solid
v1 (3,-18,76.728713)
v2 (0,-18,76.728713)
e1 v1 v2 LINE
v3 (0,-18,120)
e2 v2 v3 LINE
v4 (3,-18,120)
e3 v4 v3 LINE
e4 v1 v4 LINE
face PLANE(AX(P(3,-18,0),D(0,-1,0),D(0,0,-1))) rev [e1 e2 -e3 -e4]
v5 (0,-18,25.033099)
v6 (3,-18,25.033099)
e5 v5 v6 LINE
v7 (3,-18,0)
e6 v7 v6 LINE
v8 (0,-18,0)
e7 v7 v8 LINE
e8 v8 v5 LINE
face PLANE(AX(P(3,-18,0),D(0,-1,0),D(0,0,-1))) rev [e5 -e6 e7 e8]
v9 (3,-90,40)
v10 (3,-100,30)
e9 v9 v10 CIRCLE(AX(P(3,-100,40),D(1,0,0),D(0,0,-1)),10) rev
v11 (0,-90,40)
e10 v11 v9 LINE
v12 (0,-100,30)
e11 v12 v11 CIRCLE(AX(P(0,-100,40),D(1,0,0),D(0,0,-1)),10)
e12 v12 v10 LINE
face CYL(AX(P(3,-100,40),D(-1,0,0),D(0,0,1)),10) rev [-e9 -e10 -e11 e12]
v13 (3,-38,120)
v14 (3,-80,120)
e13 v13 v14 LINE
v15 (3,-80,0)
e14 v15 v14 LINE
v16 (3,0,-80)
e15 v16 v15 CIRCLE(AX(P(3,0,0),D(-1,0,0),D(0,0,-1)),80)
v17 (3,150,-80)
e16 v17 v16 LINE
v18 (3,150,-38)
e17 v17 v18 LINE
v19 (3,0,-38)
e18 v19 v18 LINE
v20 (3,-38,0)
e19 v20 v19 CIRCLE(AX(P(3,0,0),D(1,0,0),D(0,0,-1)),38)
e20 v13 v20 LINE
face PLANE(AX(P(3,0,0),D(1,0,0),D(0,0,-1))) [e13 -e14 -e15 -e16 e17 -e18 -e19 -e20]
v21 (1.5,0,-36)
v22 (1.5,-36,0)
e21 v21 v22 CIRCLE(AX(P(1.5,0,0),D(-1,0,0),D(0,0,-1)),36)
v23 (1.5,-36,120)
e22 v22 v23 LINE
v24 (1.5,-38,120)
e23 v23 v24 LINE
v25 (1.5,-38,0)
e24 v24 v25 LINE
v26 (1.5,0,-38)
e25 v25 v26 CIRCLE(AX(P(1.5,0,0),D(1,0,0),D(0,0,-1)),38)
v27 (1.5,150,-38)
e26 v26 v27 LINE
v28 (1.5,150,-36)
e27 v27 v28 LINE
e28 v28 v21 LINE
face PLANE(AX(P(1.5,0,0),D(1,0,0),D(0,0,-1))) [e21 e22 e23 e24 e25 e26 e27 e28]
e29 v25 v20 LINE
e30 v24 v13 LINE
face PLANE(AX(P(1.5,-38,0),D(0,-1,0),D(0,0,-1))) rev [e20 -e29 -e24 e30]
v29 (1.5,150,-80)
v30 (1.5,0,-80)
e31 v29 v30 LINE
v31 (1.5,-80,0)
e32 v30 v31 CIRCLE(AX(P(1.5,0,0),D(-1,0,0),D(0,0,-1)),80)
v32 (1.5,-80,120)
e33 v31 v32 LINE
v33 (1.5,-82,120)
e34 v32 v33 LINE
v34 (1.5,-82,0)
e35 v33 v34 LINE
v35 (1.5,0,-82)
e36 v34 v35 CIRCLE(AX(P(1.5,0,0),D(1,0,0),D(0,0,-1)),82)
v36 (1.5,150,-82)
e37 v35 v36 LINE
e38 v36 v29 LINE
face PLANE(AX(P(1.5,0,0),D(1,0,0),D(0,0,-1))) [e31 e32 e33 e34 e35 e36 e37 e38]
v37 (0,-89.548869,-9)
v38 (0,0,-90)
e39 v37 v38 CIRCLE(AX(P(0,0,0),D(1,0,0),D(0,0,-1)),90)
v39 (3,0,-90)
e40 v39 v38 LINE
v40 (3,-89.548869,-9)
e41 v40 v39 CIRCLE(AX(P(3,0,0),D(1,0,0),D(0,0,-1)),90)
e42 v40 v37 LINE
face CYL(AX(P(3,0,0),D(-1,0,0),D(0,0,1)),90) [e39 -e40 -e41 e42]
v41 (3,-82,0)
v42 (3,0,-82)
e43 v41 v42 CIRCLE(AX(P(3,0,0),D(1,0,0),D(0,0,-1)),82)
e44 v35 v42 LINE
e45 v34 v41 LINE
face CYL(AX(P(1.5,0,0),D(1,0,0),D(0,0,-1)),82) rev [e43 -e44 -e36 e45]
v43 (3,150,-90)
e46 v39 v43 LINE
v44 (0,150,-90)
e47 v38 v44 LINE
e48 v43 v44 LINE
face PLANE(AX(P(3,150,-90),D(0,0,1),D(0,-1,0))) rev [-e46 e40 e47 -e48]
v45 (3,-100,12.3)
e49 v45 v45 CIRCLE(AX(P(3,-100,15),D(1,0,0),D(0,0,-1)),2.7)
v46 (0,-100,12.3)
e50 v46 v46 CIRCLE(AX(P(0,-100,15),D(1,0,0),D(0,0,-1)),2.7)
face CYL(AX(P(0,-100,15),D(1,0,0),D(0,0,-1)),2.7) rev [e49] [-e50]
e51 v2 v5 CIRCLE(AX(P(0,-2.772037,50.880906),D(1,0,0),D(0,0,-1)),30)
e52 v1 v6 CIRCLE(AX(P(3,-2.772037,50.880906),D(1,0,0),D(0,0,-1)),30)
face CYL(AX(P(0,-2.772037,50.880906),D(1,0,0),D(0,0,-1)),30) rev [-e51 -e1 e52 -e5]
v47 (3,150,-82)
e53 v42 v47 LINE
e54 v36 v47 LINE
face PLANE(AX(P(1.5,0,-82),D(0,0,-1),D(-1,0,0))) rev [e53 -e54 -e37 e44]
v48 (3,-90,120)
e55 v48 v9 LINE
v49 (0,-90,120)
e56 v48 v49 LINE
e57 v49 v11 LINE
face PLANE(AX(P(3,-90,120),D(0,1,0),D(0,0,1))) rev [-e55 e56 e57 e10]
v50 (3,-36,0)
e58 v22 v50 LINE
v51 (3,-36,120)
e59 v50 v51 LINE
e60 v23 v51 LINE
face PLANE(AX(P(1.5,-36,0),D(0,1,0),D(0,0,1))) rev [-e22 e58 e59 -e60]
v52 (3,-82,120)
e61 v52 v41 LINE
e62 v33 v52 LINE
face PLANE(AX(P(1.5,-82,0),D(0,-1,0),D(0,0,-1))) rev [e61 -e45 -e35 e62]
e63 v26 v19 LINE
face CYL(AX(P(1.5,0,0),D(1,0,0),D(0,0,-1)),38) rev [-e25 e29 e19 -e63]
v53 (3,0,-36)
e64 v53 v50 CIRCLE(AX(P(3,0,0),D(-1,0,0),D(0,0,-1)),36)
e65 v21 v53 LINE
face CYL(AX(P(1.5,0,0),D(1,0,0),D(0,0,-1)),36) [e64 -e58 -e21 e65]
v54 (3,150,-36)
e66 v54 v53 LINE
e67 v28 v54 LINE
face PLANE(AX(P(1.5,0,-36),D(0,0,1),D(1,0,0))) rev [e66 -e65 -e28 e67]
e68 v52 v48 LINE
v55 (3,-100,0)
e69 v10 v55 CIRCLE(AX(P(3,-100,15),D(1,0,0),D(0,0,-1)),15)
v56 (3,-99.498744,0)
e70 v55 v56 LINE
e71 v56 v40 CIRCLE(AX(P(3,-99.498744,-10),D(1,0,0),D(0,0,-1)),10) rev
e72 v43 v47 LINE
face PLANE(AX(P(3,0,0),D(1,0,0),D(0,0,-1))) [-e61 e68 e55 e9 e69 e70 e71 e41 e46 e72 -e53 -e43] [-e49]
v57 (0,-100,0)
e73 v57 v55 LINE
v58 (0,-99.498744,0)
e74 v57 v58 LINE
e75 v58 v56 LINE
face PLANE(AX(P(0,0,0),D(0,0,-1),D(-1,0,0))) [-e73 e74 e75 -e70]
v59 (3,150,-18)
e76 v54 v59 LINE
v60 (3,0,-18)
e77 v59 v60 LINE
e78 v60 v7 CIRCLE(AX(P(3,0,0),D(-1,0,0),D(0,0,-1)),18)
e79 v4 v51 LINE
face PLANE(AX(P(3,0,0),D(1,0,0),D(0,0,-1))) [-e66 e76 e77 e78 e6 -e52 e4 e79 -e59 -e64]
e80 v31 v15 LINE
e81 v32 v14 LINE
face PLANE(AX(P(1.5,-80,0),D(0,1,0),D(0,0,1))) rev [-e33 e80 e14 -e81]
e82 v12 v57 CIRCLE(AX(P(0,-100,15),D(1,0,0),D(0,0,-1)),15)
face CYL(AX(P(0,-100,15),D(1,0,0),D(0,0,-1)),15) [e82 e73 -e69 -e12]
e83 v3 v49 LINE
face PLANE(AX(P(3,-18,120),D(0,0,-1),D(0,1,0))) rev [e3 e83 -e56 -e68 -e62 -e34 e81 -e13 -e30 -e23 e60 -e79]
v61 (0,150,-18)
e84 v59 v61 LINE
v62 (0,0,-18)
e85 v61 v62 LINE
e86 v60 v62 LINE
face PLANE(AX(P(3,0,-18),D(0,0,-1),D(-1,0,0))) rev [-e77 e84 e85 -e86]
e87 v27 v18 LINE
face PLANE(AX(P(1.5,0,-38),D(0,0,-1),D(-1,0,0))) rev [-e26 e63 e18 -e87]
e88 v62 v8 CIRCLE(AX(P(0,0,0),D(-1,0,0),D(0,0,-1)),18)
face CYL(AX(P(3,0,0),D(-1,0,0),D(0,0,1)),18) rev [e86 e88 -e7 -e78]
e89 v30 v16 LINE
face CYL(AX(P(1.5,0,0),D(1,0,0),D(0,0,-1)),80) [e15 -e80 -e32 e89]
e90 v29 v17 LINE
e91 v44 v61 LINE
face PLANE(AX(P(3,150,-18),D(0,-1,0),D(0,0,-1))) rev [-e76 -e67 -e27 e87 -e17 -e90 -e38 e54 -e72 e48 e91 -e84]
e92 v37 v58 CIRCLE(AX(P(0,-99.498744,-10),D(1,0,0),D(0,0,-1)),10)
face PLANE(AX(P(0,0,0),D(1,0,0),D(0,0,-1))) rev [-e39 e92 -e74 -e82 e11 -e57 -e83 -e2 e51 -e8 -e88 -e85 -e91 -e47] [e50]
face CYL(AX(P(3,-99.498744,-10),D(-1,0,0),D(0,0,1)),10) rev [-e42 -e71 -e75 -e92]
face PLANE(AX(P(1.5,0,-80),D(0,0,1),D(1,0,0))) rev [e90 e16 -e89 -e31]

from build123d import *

# Parameters (mm, degrees)
BOSS_EXTRUDE1_DEPTH = 3
CUT_EXTRUDE1_DEPTH  = 1.5
BOSS_EXTRUDE2_DEPTH = 3
FILLET1_R           = 10
SKETCH4_R           = 2.7
CUT_EXTRUDE2_DEPTH  = 193.117151759
SKETCH5_R           = 30
CUT_EXTRUDE3_DEPTH  = 193.117151759


with BuildPart() as part:
    # Sketch1 → Boss-Extrude1 (new body)
    with BuildSketch(Plane(origin=(0, 0, 0), x_dir=(0, 0, -1), z_dir=(1, 0, 0))):
        with BuildLine():
            Line((0, -18), (-120, -18))
            Line((-120, -18), (-120, -90))
            Line((-120, -90), (0, -90))
            ThreePointArc((0, -90), (63.639610307, -63.639610307), (90, 0))
            Line((90, 0), (90, 150))
            Line((90, 150), (18, 150))
            Line((18, 150), (18, 0))
            ThreePointArc((18, 0), (12.727922061, -12.727922061), (0, -18))
        make_face()
    extrude(amount=BOSS_EXTRUDE1_DEPTH)

    # Sketch2 → Cut-Extrude1 (cut)
    with BuildSketch(Plane(origin=(3, 0, 0), x_dir=(0, 0, -1), z_dir=(1, 0, 0))):
        with BuildLine():
            Line((0, -38), (-120, -38))
            Line((-120, -38), (-120, -36))
            Line((-120, -36), (0, -36))
            ThreePointArc((0, -36), (25.455844123, -25.455844123), (36, 0))
            Line((36, 0), (36, 150))
            Line((36, 150), (38, 150))
            Line((38, 150), (38, 0))
            ThreePointArc((38, 0), (26.870057685, -26.870057685), (0, -38))
        make_face()
        with BuildLine():
            Line((0, -80), (-120, -80))
            Line((-120, -80), (-120, -82))
            Line((-120, -82), (0, -82))
            ThreePointArc((0, -82), (57.982756057, -57.982756057), (82, 0))
            Line((82, 0), (82, 150))
            Line((82, 150), (80, 150))
            Line((80, 150), (80, 0))
            ThreePointArc((80, 0), (56.568542495, -56.568542495), (0, -80))
        make_face()
    extrude(amount=-CUT_EXTRUDE1_DEPTH, mode=Mode.SUBTRACT)

    # Sketch3 → Boss-Extrude2 (add)
    with BuildSketch(Plane(origin=(3, 0, 0), x_dir=(0, 0, -1), z_dir=(1, 0, 0))):
        with BuildLine():
            Line((-30, -90), (-30, -100))
            ThreePointArc((-30, -100), (-29.012585384, -94.647668653), (-26.180339887, -90))
            Line((-26.180339887, -90), (-30, -90))
        make_face()
        with BuildLine():
            ThreePointArc((-26.180339887, -90), (-29.012585384, -94.647668653), (-30, -100))
            Line((-30, -100), (0, -100))
            ThreePointArc((0, -100), (-0.987414616, -94.647668653), (-3.819660113, -90))
            Line((-3.819660113, -90), (-26.180339887, -90))
        make_face()
        with BuildLine():
            ThreePointArc((-3.819660113, -90), (-0.987414616, -94.647668653), (0, -100))
            Line((0, -100), (0, -90))
            Line((0, -90), (-3.819660113, -90))
        make_face()
        with BuildLine():
            Line((0, -100), (-30, -100))
            ThreePointArc((-30, -100), (-15, -115), (0, -100))
        make_face()
    extrude(amount=-BOSS_EXTRUDE2_DEPTH)

    # Fillet1
    fillet1_edges = [part.edges().sort_by_distance(p)[0] for p in [
        (1.5, -90, 0),
        (1.5, -90, 30),
    ]]
    fillet(fillet1_edges, radius=FILLET1_R - 0.0001)  # a hair under: the kernel refuses the full size

    # Sketch4 → Cut-Extrude2 (cut, through all)
    with BuildSketch(Plane(origin=(3, 0, 0), x_dir=(0, 0, -1), z_dir=(1, 0, 0))):
        with Locations((-15, -100)):
            Circle(SKETCH4_R)
    extrude(amount=-CUT_EXTRUDE2_DEPTH, mode=Mode.SUBTRACT)

    # Sketch5 → Cut-Extrude3 (cut, through all)
    with BuildSketch(Plane(origin=(3, 0, 0), x_dir=(0, 0, -1), z_dir=(1, 0, 0))):
        with Locations((-50.880906171, -2.772036536)):
            Circle(SKETCH5_R)
    extrude(amount=-CUT_EXTRUDE3_DEPTH, mode=Mode.SUBTRACT)


solid = part.part
